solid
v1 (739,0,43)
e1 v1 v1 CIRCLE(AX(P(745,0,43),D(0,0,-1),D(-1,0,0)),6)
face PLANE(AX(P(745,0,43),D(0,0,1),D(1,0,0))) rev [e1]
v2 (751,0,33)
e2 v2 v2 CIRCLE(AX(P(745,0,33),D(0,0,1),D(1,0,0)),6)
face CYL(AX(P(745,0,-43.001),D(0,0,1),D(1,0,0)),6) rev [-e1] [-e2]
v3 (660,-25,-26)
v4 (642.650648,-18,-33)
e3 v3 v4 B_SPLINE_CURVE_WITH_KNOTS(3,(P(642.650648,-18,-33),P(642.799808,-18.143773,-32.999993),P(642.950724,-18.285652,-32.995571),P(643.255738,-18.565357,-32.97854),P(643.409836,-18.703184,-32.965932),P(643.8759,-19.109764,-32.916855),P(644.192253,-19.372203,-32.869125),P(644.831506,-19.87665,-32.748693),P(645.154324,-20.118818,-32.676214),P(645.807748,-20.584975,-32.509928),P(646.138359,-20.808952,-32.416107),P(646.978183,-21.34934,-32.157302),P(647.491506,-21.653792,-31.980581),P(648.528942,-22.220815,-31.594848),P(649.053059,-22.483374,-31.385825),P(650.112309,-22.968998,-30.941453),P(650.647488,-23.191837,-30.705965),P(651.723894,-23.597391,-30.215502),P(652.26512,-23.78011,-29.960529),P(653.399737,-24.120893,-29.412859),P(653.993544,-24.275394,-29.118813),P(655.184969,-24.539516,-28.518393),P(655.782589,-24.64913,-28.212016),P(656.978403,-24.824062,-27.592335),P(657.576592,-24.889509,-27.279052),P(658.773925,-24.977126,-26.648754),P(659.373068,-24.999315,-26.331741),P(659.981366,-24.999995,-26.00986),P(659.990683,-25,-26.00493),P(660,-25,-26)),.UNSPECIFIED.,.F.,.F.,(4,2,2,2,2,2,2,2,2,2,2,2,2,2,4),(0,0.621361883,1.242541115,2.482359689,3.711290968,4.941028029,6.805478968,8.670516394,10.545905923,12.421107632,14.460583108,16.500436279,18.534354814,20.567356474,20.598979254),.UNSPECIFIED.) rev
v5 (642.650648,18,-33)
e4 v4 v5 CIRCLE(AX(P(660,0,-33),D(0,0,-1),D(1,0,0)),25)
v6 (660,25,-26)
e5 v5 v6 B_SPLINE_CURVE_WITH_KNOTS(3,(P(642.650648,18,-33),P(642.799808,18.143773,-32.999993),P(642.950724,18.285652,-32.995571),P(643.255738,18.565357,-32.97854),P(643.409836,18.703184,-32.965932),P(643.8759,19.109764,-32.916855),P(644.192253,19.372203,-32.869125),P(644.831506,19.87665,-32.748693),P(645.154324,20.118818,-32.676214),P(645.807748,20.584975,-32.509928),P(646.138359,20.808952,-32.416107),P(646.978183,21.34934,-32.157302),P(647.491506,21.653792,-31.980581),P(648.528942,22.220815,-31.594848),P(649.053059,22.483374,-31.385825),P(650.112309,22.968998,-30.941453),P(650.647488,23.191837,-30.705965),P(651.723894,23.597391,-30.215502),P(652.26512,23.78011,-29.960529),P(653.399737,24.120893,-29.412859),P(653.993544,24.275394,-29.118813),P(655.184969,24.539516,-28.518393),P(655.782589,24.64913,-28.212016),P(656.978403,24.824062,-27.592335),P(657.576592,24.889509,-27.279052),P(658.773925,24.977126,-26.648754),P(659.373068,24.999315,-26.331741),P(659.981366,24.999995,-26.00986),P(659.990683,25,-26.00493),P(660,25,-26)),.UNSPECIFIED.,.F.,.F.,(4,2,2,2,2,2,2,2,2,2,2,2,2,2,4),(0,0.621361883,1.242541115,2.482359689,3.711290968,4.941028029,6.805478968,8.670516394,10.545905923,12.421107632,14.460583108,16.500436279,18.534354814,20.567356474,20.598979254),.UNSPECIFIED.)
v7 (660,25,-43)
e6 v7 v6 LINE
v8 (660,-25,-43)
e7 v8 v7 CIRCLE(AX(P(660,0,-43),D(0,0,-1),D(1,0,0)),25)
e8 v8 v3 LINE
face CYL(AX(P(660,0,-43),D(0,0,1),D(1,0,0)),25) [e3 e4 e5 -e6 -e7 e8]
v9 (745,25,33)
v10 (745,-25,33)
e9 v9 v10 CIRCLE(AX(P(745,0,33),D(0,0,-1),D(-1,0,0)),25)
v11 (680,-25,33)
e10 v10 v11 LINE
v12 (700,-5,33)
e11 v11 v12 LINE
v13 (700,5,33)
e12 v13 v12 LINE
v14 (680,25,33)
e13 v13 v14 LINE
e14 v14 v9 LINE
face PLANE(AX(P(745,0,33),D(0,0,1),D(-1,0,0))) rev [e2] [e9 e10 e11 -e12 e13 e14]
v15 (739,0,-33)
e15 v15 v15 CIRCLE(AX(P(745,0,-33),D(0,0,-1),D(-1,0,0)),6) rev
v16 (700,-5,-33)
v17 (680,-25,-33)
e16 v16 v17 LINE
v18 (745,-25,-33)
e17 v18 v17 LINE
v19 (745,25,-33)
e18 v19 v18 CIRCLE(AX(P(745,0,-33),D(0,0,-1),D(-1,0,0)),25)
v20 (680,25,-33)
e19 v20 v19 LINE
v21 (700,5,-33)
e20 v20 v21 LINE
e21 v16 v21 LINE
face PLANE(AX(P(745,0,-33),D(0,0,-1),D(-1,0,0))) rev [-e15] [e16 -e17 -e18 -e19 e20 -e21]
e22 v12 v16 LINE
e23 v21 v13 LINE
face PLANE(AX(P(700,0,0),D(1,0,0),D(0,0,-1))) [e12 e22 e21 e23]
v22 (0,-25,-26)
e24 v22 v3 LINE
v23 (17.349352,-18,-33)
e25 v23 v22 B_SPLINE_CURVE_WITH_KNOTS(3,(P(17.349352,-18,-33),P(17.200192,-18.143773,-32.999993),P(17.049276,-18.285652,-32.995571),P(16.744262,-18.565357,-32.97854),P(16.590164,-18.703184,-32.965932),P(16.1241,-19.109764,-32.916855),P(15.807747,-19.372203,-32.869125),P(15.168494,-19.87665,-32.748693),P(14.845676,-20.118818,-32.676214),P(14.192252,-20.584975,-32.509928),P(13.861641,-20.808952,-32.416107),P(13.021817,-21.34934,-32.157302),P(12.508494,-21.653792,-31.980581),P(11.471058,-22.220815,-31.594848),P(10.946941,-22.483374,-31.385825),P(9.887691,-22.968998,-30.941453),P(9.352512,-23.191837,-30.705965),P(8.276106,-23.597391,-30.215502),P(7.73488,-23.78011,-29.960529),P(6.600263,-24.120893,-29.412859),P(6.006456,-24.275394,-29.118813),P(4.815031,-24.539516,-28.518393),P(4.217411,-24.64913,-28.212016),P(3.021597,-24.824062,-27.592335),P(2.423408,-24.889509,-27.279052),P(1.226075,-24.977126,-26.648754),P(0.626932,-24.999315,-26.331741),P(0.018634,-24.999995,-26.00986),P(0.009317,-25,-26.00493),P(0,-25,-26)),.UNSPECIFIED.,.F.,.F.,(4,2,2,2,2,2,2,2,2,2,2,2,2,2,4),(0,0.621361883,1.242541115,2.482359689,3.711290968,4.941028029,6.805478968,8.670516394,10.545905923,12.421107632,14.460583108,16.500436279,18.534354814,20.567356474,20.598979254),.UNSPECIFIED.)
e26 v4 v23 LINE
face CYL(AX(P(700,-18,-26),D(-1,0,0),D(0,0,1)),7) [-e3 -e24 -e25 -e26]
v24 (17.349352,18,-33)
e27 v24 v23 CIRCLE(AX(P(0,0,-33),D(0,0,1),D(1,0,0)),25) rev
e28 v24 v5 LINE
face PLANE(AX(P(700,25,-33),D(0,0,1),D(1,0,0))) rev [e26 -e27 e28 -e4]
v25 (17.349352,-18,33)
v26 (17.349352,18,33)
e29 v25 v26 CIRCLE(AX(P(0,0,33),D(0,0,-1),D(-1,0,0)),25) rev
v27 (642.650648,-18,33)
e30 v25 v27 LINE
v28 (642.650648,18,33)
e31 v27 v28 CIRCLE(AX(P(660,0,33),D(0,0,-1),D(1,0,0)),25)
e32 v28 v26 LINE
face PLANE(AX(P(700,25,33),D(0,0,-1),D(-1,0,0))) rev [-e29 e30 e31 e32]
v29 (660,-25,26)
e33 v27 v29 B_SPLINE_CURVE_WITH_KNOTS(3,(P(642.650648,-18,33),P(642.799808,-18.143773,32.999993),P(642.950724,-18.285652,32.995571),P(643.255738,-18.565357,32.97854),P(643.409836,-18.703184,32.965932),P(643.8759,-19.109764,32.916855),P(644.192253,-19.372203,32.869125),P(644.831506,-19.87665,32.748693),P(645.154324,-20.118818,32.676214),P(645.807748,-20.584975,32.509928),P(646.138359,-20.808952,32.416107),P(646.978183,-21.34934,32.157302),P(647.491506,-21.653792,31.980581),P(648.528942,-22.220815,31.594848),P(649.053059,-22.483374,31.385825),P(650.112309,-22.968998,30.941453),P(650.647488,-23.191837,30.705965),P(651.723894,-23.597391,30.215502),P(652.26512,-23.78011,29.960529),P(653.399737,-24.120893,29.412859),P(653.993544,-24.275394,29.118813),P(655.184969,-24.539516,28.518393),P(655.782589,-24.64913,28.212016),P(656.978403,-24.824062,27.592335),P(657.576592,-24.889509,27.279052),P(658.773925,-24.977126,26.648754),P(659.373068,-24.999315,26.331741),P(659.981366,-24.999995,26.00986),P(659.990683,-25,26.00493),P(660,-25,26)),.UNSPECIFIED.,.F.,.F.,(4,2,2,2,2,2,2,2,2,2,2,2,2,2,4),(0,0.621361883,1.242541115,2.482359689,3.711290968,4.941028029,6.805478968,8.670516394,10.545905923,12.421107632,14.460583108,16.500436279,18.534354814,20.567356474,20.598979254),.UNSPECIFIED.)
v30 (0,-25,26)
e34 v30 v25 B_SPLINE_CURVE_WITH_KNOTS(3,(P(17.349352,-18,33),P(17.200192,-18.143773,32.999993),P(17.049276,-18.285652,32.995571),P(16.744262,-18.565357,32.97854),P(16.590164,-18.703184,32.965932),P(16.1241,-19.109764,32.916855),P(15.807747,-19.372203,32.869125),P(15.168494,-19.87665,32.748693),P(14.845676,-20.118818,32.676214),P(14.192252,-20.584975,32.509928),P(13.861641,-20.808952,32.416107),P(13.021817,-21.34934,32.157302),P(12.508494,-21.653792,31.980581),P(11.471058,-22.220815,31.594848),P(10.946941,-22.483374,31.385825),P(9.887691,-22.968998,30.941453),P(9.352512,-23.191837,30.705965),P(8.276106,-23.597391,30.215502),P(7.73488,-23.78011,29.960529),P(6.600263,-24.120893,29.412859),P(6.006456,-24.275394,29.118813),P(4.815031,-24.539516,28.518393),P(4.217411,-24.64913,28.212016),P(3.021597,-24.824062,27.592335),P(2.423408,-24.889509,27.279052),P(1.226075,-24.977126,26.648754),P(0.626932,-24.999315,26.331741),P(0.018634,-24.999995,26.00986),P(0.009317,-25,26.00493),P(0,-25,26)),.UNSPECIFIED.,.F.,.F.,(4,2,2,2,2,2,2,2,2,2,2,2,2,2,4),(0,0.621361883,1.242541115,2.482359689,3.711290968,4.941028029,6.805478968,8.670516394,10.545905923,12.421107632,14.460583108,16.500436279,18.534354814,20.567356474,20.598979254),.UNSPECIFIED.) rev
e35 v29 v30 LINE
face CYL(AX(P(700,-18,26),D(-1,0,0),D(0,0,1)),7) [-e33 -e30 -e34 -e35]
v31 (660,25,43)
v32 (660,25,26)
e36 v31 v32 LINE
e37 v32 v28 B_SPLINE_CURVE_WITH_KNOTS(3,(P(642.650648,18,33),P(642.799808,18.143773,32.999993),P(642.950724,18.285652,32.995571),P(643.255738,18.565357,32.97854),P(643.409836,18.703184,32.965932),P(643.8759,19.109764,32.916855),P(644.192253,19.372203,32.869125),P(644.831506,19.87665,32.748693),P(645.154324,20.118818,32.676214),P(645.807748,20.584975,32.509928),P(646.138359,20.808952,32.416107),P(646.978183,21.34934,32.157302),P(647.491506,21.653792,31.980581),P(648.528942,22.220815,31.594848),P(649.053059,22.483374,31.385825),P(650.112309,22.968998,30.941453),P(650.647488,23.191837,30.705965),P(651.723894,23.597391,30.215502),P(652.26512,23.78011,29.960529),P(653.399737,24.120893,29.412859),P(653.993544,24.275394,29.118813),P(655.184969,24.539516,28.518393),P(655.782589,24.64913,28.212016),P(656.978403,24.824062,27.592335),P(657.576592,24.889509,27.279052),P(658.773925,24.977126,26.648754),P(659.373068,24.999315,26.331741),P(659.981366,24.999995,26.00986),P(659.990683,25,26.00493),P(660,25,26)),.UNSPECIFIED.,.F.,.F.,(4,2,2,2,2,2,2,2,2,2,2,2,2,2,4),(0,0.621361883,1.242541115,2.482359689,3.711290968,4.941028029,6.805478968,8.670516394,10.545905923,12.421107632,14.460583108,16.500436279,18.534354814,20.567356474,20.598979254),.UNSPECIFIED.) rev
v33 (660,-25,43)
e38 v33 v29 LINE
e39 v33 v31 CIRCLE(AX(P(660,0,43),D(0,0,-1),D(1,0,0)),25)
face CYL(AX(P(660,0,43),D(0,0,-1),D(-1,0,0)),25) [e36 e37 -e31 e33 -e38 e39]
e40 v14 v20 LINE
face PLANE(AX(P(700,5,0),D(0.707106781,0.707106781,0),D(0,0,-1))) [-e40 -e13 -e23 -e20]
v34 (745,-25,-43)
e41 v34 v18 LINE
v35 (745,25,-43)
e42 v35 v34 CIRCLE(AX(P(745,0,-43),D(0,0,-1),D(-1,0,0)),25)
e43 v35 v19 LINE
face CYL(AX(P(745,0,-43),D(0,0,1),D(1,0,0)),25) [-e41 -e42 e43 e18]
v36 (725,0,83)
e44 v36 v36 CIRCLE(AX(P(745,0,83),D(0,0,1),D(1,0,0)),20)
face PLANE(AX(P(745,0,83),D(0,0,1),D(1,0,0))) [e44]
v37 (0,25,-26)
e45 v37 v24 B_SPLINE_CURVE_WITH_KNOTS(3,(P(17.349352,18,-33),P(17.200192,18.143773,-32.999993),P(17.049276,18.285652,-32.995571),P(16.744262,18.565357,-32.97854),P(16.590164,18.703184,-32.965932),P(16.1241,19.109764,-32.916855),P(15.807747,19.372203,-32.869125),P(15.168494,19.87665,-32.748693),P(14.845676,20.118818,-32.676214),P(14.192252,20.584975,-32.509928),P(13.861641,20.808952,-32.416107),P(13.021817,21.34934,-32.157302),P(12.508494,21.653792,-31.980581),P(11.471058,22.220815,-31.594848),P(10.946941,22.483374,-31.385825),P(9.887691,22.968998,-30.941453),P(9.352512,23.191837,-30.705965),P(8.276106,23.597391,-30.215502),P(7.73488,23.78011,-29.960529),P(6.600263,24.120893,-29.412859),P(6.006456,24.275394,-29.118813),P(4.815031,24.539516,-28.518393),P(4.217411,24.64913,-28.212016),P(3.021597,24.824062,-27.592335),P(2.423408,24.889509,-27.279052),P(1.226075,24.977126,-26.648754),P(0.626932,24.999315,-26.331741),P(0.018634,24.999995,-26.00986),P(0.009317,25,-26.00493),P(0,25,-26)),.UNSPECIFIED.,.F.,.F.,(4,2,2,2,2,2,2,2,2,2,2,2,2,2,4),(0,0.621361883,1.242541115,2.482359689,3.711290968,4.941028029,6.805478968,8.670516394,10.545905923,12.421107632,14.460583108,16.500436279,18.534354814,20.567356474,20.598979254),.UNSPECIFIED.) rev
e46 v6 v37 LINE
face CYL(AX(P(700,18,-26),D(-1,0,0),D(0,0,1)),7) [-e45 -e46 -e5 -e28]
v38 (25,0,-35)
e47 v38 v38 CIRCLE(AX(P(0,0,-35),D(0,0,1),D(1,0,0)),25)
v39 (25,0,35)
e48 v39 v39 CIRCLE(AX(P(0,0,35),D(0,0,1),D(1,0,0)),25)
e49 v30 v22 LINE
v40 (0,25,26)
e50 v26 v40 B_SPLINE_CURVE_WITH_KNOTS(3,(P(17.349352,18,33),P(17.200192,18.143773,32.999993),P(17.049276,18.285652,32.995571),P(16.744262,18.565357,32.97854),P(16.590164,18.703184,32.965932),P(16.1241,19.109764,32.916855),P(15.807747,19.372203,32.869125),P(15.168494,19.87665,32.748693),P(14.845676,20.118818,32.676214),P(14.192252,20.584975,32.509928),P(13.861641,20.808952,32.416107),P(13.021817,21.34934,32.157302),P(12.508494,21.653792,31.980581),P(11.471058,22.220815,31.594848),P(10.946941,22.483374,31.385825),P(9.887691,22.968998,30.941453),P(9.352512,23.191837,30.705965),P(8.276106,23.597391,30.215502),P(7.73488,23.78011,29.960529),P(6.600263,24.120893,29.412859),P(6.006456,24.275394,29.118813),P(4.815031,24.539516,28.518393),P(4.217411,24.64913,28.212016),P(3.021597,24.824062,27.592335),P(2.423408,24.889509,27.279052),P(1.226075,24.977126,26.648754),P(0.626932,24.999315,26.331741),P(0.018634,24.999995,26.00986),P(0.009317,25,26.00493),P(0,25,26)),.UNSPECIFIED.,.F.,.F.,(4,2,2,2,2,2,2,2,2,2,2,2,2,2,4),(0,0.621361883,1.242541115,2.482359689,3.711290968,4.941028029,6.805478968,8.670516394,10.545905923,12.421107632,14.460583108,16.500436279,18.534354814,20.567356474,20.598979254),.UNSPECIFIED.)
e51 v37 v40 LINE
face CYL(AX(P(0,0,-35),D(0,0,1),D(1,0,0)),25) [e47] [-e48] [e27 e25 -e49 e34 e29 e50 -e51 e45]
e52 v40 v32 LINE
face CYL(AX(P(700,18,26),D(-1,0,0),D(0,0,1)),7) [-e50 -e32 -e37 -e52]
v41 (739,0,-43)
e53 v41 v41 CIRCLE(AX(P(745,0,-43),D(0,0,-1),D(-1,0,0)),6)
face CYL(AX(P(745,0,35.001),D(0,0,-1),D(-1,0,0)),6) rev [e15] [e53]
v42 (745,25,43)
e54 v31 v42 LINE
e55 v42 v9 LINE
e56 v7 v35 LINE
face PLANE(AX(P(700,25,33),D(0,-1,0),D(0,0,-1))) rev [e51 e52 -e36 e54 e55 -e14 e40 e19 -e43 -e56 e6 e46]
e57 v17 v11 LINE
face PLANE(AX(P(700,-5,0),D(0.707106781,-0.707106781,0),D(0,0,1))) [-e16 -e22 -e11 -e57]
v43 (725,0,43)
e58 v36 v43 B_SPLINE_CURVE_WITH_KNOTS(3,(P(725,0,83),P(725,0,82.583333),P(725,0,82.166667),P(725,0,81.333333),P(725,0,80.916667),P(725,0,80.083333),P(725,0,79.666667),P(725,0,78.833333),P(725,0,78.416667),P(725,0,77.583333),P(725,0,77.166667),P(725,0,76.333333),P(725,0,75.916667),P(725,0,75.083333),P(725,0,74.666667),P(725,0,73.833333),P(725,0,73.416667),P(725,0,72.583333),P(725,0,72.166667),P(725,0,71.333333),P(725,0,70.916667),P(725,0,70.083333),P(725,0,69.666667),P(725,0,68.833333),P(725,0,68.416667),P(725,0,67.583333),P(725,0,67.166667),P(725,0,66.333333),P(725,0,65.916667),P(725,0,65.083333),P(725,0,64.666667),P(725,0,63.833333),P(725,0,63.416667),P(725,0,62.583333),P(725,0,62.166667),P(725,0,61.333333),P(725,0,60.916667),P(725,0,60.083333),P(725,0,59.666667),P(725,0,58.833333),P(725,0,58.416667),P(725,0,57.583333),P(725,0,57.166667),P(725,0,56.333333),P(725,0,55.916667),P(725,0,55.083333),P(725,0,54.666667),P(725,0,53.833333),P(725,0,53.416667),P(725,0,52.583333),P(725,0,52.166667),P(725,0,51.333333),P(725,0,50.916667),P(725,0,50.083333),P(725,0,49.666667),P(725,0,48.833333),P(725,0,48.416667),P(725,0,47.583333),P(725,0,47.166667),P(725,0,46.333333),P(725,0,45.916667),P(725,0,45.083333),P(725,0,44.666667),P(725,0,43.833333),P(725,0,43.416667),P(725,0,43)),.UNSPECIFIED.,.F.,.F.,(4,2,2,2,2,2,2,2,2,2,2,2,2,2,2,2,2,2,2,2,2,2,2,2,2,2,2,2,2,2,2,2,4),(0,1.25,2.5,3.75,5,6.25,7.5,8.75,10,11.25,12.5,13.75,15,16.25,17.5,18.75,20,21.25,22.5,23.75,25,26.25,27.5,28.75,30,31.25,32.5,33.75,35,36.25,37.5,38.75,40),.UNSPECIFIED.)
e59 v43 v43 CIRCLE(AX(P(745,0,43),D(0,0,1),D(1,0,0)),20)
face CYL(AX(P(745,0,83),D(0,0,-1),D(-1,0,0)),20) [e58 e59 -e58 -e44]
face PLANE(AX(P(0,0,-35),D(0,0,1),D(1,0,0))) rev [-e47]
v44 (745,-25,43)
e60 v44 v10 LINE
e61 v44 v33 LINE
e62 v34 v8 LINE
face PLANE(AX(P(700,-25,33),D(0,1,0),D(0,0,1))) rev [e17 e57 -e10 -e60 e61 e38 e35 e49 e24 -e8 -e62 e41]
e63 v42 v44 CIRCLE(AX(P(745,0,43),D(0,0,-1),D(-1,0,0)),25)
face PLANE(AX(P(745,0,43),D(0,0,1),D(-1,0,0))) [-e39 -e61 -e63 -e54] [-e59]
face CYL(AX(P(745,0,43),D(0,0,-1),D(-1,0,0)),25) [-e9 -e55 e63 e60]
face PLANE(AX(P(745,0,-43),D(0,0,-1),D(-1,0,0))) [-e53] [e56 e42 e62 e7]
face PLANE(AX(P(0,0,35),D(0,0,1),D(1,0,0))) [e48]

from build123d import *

# Parameters (mm, degrees)
AUFSATZ_LINEAR_AUSTRAGEN1_DEPTH      = 35
AUFSATZ_LINEAR_AUSTRAGEN1_DEPTH_BACK = 35
SKIZZE1_R                            = 25
SKIZZE2_W                            = 66
SKIZZE2_H                            = 50
AUFSATZ_LINEAR_AUSTRAGEN2_DEPTH      = 700
AUFSATZ_LINEAR_AUSTRAGEN3_DEPTH      = 10
SCHNITT_LINEAR_AUSTRAGEN1_REACH      = 776.344
SKIZZE4_R                            = 6
VERRUNDUNG2_START                    = -1e-07
VERRUNDUNG2_DEPTH                    = 660.0000001
VERRUNDUNG2_START_2                  = -33
VERRUNDUNG2_2_DEPTH                  = 66
FASE1_SIZE                           = 20
SKIZZE5_R                            = 20
AUFSATZ_LINEAR_AUSTRAGEN4_DEPTH      = 40


with BuildPart() as part:
    # Skizze1 → Aufsatz-Linear austragen1 (new, two sides: drawn at the far end of the back side and taken through both)
    with BuildSketch(Plane.XY.offset(-AUFSATZ_LINEAR_AUSTRAGEN1_DEPTH_BACK)):
        Circle(SKIZZE1_R)
    extrude(amount=AUFSATZ_LINEAR_AUSTRAGEN1_DEPTH + AUFSATZ_LINEAR_AUSTRAGEN1_DEPTH_BACK)

    # Skizze2 → Aufsatz-Linear austragen2 (add)
    with BuildSketch(Plane(origin=(0, 0, 0), x_dir=(0, 0, -1), z_dir=(1, 0, 0))):
        Rectangle(SKIZZE2_W, SKIZZE2_H)
    extrude(amount=AUFSATZ_LINEAR_AUSTRAGEN2_DEPTH)

    # Skizze3 → Aufsatz-Linear austragen3 (add)
    with BuildSketch(Plane(origin=(0, 0, -33), x_dir=(-1, 0, 0), z_dir=(0, 0, -1))):
        with BuildLine():
            Line((-700, 25), (-660, 25))
            ThreePointArc((-660, 25), (-635, 0), (-660, -25))
            Line((-660, -25), (-700, -25))
            Line((-700, -25), (-745, -25))
            ThreePointArc((-745, -25), (-770, 0), (-745, 25))
            Line((-745, 25), (-700, 25))
        make_face()
    aufsatz_linear_austragen3 = extrude(amount=AUFSATZ_LINEAR_AUSTRAGEN3_DEPTH)

    # Skizze4 → Schnitt-Linear austragen1 (cut, up to next)
    with BuildSketch(Plane(origin=(0, 0, -43), x_dir=(-1, 0, 0), z_dir=(0, 0, -1)), mode=Mode.PRIVATE) as schnitt_linear_austragen1_sk1:
        with Locations((-745, 0)):
            Circle(SKIZZE4_R)
    schnitt_linear_austragen1_tool1 = extrude(schnitt_linear_austragen1_sk1.sketch, amount=-SCHNITT_LINEAR_AUSTRAGEN1_REACH, mode=Mode.PRIVATE) & part.part
    schnitt_linear_austragen1 = schnitt_linear_austragen1_tool1.solids().sort_by_distance((745, 0, -43))[0]
    add(schnitt_linear_austragen1, mode=Mode.SUBTRACT)

    # Spiegeln1: Aufsatz-Linear austragen3, Schnitt-Linear austragen1 across plane
    add(aufsatz_linear_austragen3.mirror(Plane.XY))
    add(schnitt_linear_austragen1.mirror(Plane.XY), mode=Mode.SUBTRACT)

    # Verrundung2: read off the stored shape, not the designer's step
    # Verrundung2 outline → Verrundung2 (cut)
    with BuildSketch(Plane.YZ.offset(VERRUNDUNG2_START)):
        with BuildLine():
            Line((-25, -33), (-18, -33))
            ThreePointArc((-18, -33), (-22.949747468, -30.949747468), (-25, -26))
            Line((-25, -26), (-25, -33))
        make_face()
        with BuildLine():
            ThreePointArc((25, -26), (22.949747468, -30.949747468), (18, -33))
            Line((18, -33), (25, -33))
            Line((25, -33), (25, -26))
        make_face()
        with BuildLine():
            Line((-25, 33), (-25, 26))
            ThreePointArc((-25, 26), (-22.949747468, 30.949747468), (-18, 33))
            Line((-18, 33), (-25, 33))
        make_face()
        with BuildLine():
            ThreePointArc((18, 33), (22.949747468, 30.949747468), (25, 26))
            Line((25, 26), (25, 33))
            Line((25, 33), (18, 33))
        make_face()
    extrude(amount=VERRUNDUNG2_DEPTH, mode=Mode.SUBTRACT)

    # Verrundung2 2 outline → Verrundung2 2 (add)
    with BuildSketch(Plane.XY.offset(VERRUNDUNG2_START_2)):
        with BuildLine():
            Line((17.349351573, -18), (-1e-07, -18))
            Line((-1e-07, -18), (0, -25))
            ThreePointArc((0, -25), (9.354143467, -23.184046239), (17.349351573, -18))
        make_face()
        with BuildLine():
            Line((660, -18), (642.650648427, -18))
            ThreePointArc((642.650648427, -18), (650.645856533, -23.184046239), (660, -25))
            Line((660, -25), (660, -18))
        make_face()
        with BuildLine():
            Line((660, 18), (660, 25))
            ThreePointArc((660, 25), (650.645856533, 23.184046239), (642.650648427, 18))
            Line((642.650648427, 18), (660, 18))
        make_face()
        with BuildLine():
            ThreePointArc((17.349351573, 18), (9.354143467, 23.184046239), (0, 25))
            Line((0, 25), (-1e-07, 18))
            Line((-1e-07, 18), (17.349351573, 18))
        make_face()
    extrude(amount=VERRUNDUNG2_2_DEPTH)

    # Fase1
    fase1_edges = [part.edges().sort_by_distance(p)[0] for p in [
        (700, -25, 0),
        (700, 25, 0),
    ]]
    chamfer(fase1_edges, length=FASE1_SIZE)

    # Skizze5 → Aufsatz-Linear austragen4 (add)
    with BuildSketch(Plane.XY.offset(43)):
        with Locations(Location((745, 0, 0), (0, 0, 180))):
            Circle(SKIZZE5_R)
    extrude(amount=AUFSATZ_LINEAR_AUSTRAGEN4_DEPTH)


solid = part.part
